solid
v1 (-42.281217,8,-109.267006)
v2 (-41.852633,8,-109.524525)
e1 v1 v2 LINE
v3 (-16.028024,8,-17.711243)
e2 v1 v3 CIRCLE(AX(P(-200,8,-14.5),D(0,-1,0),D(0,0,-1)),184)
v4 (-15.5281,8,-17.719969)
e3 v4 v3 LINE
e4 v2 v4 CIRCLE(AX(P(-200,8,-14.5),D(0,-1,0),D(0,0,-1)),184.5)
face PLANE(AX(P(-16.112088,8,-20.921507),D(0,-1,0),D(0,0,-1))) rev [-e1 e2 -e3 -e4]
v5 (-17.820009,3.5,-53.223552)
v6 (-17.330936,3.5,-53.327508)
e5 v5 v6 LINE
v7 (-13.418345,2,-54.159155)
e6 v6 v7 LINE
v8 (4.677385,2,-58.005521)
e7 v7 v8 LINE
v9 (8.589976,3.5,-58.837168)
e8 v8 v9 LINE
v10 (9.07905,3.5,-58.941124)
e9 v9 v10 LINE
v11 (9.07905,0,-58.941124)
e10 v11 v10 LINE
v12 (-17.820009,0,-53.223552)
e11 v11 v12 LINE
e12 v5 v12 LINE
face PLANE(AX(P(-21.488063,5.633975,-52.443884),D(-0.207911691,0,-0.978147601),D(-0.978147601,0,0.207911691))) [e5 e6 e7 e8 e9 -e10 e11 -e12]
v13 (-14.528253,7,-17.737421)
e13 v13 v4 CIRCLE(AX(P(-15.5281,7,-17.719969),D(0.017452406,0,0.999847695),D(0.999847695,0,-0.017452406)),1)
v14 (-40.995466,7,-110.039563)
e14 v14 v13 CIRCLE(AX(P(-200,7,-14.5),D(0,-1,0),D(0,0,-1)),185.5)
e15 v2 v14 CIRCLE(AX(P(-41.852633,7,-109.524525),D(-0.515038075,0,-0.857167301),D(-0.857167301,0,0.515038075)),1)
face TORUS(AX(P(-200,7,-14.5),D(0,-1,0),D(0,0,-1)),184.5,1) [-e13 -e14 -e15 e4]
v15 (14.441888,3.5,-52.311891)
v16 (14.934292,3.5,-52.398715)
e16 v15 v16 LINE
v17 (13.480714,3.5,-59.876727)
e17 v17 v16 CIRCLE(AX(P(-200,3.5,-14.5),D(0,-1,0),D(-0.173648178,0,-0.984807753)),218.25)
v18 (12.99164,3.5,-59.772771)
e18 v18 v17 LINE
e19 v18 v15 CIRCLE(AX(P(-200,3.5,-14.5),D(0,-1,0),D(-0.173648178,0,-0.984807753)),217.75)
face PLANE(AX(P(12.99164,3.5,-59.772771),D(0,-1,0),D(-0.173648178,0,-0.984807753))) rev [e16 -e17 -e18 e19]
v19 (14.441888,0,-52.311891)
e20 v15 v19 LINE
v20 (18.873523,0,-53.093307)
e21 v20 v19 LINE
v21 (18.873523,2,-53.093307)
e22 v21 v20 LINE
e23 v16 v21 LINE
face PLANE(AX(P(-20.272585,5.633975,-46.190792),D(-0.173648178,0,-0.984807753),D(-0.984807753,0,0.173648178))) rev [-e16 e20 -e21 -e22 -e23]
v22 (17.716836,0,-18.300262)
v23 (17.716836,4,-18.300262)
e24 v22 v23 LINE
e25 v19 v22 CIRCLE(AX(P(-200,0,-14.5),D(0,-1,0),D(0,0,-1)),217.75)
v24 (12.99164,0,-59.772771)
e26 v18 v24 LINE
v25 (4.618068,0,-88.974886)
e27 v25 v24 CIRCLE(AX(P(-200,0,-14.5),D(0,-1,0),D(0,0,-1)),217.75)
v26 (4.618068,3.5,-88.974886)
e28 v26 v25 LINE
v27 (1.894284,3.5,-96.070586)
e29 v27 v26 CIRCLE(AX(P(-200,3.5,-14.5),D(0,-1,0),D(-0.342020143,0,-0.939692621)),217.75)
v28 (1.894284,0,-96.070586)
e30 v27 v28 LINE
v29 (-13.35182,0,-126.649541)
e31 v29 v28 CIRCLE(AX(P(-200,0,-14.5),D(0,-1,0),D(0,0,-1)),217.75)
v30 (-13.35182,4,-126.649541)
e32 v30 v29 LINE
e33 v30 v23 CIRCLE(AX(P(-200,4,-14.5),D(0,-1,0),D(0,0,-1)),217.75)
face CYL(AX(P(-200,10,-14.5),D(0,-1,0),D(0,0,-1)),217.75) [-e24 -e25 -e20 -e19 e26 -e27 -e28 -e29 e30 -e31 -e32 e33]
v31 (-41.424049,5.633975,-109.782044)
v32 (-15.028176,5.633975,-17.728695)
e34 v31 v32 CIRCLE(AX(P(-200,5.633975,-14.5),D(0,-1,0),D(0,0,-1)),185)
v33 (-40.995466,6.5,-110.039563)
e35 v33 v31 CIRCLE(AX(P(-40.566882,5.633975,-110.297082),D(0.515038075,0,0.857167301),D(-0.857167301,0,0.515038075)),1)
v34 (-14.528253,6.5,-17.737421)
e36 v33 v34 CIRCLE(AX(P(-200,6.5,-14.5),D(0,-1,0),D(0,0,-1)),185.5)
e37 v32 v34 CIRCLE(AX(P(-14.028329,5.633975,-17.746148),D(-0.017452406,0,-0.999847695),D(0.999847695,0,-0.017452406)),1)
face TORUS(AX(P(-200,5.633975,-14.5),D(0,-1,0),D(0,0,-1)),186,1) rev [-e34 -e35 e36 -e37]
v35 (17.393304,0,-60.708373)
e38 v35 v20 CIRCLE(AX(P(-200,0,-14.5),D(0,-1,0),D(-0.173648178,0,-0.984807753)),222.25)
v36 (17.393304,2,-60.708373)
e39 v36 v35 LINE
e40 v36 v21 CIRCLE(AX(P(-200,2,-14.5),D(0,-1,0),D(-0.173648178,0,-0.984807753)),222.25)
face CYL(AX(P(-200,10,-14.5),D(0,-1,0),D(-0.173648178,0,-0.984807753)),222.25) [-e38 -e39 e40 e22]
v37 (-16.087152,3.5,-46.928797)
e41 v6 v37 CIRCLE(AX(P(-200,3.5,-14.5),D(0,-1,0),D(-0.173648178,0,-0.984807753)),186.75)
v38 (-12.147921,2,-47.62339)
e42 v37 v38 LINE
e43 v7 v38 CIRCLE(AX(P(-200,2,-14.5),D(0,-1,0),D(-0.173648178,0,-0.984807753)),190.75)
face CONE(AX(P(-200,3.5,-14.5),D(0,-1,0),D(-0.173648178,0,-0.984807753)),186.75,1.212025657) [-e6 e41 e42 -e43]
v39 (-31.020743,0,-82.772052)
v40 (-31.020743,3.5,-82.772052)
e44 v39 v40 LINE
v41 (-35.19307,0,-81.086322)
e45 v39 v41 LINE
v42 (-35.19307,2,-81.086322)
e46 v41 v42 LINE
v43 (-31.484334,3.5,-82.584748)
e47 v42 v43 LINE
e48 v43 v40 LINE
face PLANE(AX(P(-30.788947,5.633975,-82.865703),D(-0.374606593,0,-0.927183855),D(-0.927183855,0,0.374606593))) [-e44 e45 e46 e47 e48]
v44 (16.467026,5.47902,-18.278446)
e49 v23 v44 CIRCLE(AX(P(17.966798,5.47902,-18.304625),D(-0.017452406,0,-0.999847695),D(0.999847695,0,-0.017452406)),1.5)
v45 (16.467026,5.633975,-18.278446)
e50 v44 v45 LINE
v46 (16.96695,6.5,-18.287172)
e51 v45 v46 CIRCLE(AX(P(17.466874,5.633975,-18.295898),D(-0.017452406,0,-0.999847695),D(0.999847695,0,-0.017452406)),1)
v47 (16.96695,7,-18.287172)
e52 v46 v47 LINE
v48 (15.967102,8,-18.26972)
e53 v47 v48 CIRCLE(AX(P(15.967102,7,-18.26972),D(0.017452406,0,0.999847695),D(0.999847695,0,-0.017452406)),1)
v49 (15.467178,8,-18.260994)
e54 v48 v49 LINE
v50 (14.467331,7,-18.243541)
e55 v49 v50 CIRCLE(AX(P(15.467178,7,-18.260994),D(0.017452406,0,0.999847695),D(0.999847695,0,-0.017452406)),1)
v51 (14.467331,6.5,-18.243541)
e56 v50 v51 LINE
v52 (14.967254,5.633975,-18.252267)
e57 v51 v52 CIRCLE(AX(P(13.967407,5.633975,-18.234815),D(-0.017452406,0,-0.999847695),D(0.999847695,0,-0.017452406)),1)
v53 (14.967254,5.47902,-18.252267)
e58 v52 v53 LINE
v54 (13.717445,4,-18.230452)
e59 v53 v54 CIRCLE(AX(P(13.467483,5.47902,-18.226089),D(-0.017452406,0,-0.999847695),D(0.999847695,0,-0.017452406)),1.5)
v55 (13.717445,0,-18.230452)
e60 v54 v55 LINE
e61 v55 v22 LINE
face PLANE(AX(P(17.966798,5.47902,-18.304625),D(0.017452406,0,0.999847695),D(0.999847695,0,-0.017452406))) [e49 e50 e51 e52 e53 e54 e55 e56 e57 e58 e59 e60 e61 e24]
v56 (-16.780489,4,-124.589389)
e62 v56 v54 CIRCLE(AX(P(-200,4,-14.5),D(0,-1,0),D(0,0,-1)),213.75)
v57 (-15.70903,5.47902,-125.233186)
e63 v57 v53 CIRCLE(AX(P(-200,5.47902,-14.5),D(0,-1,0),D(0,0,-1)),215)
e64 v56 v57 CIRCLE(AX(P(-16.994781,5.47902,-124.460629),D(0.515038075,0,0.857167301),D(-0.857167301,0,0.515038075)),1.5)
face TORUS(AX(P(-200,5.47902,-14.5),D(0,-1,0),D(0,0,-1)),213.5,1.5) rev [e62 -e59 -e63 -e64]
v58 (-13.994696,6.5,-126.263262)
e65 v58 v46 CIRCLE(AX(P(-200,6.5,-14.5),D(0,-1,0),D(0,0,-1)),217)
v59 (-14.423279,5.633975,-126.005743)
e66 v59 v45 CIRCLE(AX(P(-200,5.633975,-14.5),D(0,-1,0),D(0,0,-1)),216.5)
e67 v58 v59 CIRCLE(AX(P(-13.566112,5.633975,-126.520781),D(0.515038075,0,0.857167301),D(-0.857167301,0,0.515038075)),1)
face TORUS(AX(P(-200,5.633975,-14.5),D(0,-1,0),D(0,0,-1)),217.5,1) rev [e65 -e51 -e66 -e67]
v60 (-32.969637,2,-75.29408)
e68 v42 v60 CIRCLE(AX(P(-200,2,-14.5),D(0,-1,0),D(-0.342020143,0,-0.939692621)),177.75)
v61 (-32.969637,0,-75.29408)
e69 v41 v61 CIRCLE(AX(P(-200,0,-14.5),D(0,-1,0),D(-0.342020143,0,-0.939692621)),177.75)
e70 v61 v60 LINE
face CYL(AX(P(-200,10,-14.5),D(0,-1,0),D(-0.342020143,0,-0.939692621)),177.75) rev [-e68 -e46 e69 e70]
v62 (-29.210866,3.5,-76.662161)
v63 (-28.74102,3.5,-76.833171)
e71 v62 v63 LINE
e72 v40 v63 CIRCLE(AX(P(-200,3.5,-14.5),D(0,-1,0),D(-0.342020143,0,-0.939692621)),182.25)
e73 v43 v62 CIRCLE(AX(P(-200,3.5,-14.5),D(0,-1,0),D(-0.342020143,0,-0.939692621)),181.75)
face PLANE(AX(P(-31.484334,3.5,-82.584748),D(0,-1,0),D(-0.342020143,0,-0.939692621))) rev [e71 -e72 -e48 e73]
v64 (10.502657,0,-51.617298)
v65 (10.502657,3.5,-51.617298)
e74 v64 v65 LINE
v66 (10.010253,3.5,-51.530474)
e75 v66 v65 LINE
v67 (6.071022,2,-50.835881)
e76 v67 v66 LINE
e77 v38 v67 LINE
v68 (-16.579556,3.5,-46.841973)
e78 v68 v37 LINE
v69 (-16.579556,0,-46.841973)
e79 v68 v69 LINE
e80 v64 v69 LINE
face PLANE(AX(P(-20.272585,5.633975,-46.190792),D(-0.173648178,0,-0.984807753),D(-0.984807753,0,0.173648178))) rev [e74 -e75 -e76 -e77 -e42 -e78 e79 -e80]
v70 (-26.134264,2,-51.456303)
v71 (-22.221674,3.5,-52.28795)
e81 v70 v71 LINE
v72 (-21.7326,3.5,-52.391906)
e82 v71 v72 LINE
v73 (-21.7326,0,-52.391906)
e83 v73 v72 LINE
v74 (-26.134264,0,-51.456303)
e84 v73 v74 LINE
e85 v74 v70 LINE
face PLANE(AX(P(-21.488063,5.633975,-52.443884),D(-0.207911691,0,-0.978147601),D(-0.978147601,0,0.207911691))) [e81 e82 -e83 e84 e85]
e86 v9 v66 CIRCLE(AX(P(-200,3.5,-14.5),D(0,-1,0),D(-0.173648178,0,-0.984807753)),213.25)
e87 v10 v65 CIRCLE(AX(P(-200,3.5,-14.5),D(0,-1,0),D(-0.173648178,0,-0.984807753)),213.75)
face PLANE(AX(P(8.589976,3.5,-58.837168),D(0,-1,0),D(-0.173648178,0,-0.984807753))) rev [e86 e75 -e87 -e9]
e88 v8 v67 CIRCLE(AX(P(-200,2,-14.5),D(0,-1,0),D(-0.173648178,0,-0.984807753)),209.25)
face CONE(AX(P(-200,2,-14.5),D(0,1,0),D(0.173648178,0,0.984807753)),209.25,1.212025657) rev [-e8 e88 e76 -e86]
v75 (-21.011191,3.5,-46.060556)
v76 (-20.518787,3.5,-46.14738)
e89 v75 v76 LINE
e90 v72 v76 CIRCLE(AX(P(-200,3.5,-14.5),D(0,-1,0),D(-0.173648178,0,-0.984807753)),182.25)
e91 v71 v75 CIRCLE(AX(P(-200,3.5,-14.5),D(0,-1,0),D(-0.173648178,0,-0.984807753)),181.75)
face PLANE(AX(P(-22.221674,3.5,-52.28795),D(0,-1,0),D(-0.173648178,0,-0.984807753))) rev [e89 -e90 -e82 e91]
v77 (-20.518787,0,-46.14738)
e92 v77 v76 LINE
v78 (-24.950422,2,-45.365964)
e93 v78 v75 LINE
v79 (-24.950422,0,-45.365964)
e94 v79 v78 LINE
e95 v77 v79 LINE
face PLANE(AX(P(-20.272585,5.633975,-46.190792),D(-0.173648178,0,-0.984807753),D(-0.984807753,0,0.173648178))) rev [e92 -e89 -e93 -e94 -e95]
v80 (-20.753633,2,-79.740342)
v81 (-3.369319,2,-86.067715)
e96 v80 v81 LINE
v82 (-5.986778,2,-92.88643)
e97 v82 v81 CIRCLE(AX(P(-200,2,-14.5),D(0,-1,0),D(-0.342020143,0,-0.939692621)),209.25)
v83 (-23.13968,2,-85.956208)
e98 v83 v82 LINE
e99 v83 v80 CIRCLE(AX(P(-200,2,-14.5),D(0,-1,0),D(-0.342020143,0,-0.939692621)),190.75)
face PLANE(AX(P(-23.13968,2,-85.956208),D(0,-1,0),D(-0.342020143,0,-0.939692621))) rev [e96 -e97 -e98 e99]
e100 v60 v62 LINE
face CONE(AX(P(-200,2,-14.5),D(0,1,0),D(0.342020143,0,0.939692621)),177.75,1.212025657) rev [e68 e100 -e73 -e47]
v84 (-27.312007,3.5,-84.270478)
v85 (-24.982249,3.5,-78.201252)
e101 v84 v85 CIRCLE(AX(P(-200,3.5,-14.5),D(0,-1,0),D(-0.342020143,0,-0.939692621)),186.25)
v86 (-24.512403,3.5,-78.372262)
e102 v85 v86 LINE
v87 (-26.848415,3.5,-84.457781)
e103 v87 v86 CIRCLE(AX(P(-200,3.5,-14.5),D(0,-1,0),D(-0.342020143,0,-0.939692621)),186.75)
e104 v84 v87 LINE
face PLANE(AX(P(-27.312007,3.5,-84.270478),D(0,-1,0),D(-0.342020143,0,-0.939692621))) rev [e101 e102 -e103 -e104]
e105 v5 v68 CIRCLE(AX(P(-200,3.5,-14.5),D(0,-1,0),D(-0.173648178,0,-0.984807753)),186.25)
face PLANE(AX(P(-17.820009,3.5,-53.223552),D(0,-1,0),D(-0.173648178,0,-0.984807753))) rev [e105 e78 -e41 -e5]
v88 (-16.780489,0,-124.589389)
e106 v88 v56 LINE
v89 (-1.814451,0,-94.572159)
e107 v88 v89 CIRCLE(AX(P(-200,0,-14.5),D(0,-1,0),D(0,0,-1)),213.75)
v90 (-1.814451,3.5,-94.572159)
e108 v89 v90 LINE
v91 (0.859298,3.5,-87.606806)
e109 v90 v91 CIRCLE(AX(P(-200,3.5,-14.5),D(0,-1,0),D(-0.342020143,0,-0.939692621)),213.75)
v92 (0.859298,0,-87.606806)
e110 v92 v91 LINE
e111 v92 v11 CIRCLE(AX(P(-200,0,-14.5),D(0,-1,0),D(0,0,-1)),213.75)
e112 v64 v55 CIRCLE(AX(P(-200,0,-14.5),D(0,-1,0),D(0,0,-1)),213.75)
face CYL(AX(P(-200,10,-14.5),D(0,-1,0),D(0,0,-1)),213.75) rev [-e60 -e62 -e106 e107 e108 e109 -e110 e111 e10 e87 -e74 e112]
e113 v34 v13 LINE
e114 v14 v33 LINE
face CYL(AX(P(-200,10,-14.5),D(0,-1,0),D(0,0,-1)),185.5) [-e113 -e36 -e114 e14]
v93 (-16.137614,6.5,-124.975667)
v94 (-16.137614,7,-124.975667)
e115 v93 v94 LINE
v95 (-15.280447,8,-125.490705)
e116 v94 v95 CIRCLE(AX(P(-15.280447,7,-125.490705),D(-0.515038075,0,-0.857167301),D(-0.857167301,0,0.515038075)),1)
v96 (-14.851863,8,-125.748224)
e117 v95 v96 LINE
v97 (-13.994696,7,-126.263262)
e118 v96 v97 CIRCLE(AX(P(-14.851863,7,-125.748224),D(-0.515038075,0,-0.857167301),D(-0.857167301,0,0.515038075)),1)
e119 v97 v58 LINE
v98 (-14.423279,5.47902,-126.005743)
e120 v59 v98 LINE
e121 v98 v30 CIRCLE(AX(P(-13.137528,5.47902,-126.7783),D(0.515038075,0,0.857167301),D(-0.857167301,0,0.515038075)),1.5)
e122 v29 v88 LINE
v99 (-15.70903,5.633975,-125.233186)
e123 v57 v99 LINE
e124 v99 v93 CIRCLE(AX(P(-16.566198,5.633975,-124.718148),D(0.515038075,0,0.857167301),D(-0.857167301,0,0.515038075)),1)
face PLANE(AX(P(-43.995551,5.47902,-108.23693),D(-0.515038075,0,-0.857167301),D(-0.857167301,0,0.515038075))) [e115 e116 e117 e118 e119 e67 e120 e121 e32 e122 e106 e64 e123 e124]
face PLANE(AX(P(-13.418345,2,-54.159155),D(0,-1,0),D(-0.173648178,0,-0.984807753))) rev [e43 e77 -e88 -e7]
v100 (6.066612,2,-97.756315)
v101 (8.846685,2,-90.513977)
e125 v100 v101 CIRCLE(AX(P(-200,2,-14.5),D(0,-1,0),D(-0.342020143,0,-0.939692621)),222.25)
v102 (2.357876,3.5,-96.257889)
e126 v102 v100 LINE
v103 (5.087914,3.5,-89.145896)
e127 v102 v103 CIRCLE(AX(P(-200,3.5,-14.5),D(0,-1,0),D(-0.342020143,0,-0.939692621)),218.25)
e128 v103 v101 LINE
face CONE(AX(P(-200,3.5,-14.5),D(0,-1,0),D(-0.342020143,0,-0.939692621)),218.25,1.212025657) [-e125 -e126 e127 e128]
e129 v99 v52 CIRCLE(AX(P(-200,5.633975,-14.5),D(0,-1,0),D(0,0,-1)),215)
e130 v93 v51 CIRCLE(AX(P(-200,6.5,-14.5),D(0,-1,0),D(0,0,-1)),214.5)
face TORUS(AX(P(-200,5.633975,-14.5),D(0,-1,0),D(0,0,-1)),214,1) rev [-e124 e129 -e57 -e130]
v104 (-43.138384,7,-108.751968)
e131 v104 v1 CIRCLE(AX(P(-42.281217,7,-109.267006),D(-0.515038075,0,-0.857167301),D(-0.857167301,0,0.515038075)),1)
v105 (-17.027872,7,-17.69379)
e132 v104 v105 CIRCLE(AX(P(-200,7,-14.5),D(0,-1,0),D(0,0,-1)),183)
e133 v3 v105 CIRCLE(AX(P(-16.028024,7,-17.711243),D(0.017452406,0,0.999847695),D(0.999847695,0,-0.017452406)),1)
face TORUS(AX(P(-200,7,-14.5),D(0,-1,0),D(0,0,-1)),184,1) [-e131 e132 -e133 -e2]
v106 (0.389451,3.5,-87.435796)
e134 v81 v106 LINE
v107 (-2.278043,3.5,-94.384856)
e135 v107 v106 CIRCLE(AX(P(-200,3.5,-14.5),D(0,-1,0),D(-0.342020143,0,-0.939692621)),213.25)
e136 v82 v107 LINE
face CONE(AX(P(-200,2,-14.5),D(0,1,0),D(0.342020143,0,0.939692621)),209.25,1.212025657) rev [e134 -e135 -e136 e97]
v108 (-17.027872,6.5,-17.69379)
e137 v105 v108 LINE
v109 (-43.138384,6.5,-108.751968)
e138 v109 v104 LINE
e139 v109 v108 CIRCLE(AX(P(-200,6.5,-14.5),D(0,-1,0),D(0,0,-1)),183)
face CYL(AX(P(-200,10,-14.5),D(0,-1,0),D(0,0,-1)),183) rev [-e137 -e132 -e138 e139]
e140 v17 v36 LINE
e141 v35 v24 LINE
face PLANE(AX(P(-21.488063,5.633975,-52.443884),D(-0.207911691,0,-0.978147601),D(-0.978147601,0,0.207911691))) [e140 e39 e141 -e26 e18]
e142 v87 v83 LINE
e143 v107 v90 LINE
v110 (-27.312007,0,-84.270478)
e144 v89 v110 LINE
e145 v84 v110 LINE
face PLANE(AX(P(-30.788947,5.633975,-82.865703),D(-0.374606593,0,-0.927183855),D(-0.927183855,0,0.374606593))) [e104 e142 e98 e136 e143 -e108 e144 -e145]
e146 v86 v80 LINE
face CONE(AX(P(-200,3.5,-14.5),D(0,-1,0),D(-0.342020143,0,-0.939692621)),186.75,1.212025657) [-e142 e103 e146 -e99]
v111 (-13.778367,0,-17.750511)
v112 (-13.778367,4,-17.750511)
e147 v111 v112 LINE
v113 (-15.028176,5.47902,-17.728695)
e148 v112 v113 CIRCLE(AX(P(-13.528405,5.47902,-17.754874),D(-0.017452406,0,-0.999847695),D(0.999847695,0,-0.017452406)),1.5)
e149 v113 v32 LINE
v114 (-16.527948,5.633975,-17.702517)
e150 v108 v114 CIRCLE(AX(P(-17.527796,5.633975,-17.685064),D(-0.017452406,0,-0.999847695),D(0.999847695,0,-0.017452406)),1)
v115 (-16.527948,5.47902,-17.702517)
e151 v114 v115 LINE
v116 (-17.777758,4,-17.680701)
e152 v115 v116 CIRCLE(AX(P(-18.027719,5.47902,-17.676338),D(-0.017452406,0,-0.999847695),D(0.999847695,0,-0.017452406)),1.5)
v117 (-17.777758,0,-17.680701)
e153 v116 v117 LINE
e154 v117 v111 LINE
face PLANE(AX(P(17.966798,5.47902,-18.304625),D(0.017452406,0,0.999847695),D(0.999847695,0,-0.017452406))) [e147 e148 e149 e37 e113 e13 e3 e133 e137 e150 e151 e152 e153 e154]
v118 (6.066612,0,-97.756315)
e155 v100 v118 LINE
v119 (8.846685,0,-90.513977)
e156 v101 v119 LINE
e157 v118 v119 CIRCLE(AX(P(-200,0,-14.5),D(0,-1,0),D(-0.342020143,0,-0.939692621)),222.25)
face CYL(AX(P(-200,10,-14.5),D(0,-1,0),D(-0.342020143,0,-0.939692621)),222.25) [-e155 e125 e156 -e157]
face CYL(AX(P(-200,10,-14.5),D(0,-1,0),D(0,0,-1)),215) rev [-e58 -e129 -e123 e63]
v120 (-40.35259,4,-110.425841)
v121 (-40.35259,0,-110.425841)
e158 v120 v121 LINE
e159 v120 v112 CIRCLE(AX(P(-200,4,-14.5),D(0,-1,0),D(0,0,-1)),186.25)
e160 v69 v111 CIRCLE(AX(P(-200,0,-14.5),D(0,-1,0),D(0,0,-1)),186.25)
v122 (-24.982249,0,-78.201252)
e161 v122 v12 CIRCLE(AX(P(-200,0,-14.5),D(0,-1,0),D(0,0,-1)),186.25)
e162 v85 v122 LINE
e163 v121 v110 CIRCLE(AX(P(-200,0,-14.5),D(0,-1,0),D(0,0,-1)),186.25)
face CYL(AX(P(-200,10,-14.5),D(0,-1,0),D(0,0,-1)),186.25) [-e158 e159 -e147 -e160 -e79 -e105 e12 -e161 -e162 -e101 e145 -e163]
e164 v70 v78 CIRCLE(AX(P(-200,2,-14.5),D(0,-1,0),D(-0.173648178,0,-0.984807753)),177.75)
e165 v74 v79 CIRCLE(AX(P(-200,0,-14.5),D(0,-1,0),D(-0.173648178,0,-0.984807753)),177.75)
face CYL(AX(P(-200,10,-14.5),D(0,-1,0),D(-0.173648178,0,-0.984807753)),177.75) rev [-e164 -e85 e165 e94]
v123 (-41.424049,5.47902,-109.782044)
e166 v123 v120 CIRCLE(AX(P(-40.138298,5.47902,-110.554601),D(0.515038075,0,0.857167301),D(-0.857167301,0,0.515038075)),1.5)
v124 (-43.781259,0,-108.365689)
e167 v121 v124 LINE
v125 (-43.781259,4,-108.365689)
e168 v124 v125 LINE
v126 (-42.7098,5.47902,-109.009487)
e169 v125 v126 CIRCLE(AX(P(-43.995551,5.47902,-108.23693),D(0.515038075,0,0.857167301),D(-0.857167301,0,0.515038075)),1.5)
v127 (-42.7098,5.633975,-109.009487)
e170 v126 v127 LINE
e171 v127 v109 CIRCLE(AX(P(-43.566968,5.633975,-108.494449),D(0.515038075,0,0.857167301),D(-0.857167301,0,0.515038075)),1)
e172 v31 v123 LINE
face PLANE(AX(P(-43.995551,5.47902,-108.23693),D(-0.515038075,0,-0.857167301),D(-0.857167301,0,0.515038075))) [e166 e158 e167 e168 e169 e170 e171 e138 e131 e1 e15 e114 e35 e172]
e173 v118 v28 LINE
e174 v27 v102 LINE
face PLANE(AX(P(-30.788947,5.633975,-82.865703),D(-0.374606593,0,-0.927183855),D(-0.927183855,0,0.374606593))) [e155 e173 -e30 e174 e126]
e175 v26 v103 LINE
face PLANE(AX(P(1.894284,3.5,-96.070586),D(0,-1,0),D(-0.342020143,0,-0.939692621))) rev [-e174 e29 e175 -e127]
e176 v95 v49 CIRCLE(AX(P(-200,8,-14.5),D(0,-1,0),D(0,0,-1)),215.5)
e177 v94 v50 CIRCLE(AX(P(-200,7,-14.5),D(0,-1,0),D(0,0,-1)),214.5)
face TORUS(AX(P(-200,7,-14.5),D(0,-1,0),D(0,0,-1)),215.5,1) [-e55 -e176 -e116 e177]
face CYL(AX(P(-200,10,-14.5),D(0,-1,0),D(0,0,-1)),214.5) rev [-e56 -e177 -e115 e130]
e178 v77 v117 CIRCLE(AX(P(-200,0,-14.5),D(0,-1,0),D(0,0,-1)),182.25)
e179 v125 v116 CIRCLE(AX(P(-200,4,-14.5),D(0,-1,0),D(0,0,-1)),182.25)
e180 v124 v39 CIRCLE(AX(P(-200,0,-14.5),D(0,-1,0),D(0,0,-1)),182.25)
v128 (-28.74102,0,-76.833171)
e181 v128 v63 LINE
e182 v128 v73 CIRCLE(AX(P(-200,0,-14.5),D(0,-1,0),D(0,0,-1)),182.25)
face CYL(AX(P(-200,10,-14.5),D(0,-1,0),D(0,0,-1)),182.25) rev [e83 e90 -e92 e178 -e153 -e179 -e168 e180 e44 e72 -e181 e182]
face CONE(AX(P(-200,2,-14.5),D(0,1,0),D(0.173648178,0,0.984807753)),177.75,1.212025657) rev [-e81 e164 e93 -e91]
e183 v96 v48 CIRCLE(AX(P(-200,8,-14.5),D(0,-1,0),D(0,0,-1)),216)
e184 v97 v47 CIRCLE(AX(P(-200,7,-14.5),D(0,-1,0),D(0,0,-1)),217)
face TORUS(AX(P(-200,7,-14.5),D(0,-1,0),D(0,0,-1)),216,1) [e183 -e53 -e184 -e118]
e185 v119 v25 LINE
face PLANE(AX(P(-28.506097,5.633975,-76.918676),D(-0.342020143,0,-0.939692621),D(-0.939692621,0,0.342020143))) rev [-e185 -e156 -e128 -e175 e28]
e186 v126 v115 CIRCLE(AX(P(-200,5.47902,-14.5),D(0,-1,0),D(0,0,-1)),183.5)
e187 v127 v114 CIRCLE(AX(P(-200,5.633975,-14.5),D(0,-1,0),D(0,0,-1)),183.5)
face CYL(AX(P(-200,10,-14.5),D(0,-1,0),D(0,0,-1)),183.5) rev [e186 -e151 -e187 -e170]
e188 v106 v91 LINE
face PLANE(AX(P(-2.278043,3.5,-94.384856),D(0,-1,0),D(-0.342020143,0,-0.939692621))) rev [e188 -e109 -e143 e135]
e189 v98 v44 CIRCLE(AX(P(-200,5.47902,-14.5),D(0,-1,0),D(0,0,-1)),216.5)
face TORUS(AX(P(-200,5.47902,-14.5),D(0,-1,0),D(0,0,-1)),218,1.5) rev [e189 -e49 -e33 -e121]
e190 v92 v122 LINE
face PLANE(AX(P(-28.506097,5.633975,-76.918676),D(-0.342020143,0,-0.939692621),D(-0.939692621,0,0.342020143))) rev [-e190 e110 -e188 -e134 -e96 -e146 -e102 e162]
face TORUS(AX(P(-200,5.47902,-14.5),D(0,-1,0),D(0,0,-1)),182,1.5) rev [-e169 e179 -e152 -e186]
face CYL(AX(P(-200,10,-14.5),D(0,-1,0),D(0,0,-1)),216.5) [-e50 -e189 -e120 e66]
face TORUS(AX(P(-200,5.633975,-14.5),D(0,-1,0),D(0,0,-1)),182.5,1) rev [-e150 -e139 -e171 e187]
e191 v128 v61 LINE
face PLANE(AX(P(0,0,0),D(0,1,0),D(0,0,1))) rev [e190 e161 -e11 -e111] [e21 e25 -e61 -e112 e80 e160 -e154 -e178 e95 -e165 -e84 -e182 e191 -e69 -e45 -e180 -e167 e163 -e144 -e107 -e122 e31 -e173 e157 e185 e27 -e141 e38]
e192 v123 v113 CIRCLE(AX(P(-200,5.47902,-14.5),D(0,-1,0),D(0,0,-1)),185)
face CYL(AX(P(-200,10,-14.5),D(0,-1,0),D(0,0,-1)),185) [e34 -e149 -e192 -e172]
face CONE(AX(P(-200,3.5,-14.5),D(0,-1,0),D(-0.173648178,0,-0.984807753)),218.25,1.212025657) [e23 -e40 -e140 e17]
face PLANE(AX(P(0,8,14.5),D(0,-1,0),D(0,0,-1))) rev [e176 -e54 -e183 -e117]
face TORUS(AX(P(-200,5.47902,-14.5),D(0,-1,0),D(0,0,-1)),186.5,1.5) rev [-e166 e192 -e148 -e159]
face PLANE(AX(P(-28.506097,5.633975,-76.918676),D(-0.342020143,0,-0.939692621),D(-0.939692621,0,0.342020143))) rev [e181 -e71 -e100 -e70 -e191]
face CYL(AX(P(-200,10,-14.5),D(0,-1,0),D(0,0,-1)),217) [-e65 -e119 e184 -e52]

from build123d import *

# Parameters (mm, degrees)
SKETCH_1_W               = 4
SKETCH_1_H               = 21
SKETCH_1_H_2             = 8
EXTRUDE_1_DEPTH          = 4
SKETCH_1_7_W             = 44.5
SKETCH_1_7_H             = 8
EXTRUDE_2_DEPTH          = 3.5
SKETCH_2_W               = 18.5
SKETCH_2_H               = 1.5
CUT_EXTRUDE_1_DEPTH      = 37.7704025
SKETCH_2_3_W             = 2.5
SKETCH_2_3_H             = 1.5
EXTRUDE_4_DEPTH          = 29
FILLET_1_R               = 1
FILLET_2_R               = 1.5
FILLET_3_R               = 1
REVOLVE_2_ANGLE          = 32
CUT_EXTRUDE_5_DEPTH      = 125.273573818
REVOLVE_1_ANGLE          = 2
PATTERN_CIRCULAR_1_COUNT = 4
PATTERN_CIRCULAR_1_ANGLE = 30
CUT_REVOLVE_1_ANGLE      = 1
CUT_REVOLVE_2_ANGLE      = 1
CUT_REVOLVE_3_ANGLE      = 1
CUT_REVOLVE_4_ANGLE      = 1


with BuildPart() as part:
    # 草图1 → 凸台-拉伸1 (new body)
    with BuildSketch(Plane(origin=(0, 0, 0), x_dir=(1, 0, 0), z_dir=(0, 1, 0))):
        with Locations((-15.75, -4)):
            Rectangle(SKETCH_1_W, SKETCH_1_H)
        with Locations((15.75, -4)):
            Rectangle(SKETCH_1_W, SKETCH_1_H)
        with Locations((15.75, 10.5)):
            Rectangle(SKETCH_1_W, SKETCH_1_H_2)
        with Locations((-15.75, 10.5)):
            Rectangle(SKETCH_1_W, SKETCH_1_H_2)
    extrude(amount=EXTRUDE_1_DEPTH)

    # 草图1<7> → 凸台-拉伸2 (add)
    with BuildSketch(Plane(origin=(0, 0, 0), x_dir=(1, 0, 0), z_dir=(0, 1, 0))):
        with Locations((0, 10.5)):
            Rectangle(SKETCH_1_7_W, SKETCH_1_7_H)
    extrude(amount=EXTRUDE_2_DEPTH)

    # 草图2 → 切除-拉伸1 (cut, through all)
    with BuildSketch(Plane(origin=(0, 0, -14.5), x_dir=(-1, 0, 0), z_dir=(0, 0, -1))):
        with Locations((0, 2.75)):
            Rectangle(SKETCH_2_W, SKETCH_2_H)
        Polygon((13.25, 3.5), (9.25, 3.5), (9.25, 2), align=None)
        Polygon((-9.25, 3.5), (-13.25, 3.5), (-9.25, 2), align=None)
        Polygon((-22.25, 3.5), (-22.25, 2), (-18.25, 3.5), align=None)
        Polygon((22.25, 3.5), (18.25, 3.5), (22.25, 2), align=None)
    extrude(amount=-CUT_EXTRUDE_1_DEPTH, mode=Mode.SUBTRACT)

    # 草图2<3> → 凸台-拉伸4 (add, through all)
    with BuildSketch(Plane(origin=(0, 0, -14.5), x_dir=(-1, 0, 0), z_dir=(0, 0, -1))):
        with Locations((-15.75, 7.25)):
            Rectangle(SKETCH_2_3_W, SKETCH_2_3_H)
        Polygon((-15, 6.5), (-16.5, 6.5), (-16.5, 4), (-15.75, 4), (-15, 4), align=None)
        with Locations((15.75, 7.25)):
            Rectangle(SKETCH_2_3_W, SKETCH_2_3_H)
        Polygon((16.5, 6.5), (15, 6.5), (15, 4), (15.75, 4), (16.5, 4), align=None)
    extrude(amount=-EXTRUDE_4_DEPTH)

    # 圆角1
    # the kernel refuses this fillet: 1 mm, written as the material it adds along each edge
    with BuildSketch(Plane(origin=(-16.5, 6.5, -14.5), x_dir=(-1, 0, 0), z_dir=(0, 0, 1)), Plane(origin=(15, 6.5, -14.5), x_dir=(-1, 0, 0), z_dir=(0, 0, 1))) as fillet_1_piece_1:
        with BuildLine():
            CenterArc((1, 0.866025404), FILLET_1_R, 180, 60)
            Line((0, 0.866025404), (-0.02, 0.866025404))
            Line((-0.02, 0.866025404), (-0.02, 0))
            Line((-0.02, 0), (0, -0.02))
            ThreePointArc((0, -0.02), (0.25, -0.02), (0.49, -0.017320508))
            Line((0.49, -0.017320508), (0.5, 0))
        make_face()
    extrude(amount=29)
    with BuildSketch(Plane(origin=(-15, 6.5, -14.5), x_dir=(0, -1, 0), z_dir=(0, 0, 1)), Plane(origin=(16.5, 6.5, -14.5), x_dir=(0, -1, 0), z_dir=(0, 0, 1))) as fillet_1_piece_2:
        with BuildLine():
            CenterArc((0.866025404, 1), FILLET_1_R, 210, 60)
            Line((0, 0.5), (-0.017320508, 0.49))
            ThreePointArc((-0.017320508, 0.49), (-0.02, 0.25), (-0.02, 0))
            Line((-0.02, 0), (0, -0.02))
            Line((0, -0.02), (0.866025404, -0.02))
            Line((0.866025404, -0.02), (0.866025404, 0))
        make_face()
    extrude(amount=29)

    # 圆角2
    # the kernel refuses this fillet: 1.5 mm, written as the material it adds along each edge
    with BuildSketch(Plane(origin=(16.5, 4, -14.5), x_dir=(1, 0, 0), z_dir=(0, 0, 1))) as fillet_2_piece_1:
        with BuildLine():
            CenterArc((1.5, 1.479019946), FILLET_2_R, 180, 80.405931773)
            Line((0, 1.479019946), (-0.03, 1.479019946))
            Line((-0.03, 1.479019946), (-0.03, 0))
            Line((-0.03, 0), (0, -0.03))
            ThreePointArc((0, -0.03), (0.625, -0.03), (1.245, -0.029580399))
            Line((1.245, -0.029580399), (1.25, 0))
        make_face()
    extrude(amount=29)
    with BuildSketch(Plane(origin=(15, 4, -14.5), x_dir=(0, 1, 0), z_dir=(0, 0, 1)), Plane(origin=(-16.5, 4, -14.5), x_dir=(0, 1, 0), z_dir=(0, 0, 1))) as fillet_2_piece_2:
        with BuildLine():
            CenterArc((1.479019946, 1.5), FILLET_2_R, 189.594068227, 80.405931773)
            Line((0, 1.25), (-0.029580399, 1.245))
            ThreePointArc((-0.029580399, 1.245), (-0.03, 0.625), (-0.03, 0))
            Line((-0.03, 0), (0, -0.03))
            Line((0, -0.03), (1.479019946, -0.03))
            Line((1.479019946, -0.03), (1.479019946, 0))
        make_face()
    extrude(amount=29)
    with BuildSketch(Plane(origin=(-15, 4, -14.5), x_dir=(0, 1, 0), z_dir=(0, 0, 1))) as fillet_2_piece_3:
        with BuildLine():
            CenterArc((1.479019946, -1.5), FILLET_2_R, 90, 80.405931773)
            Line((0, -1.25), (-0.029580399, -1.245))
            ThreePointArc((-0.029580399, -1.245), (-0.03, -0.625), (-0.03, 0))
            Line((-0.03, 0), (0, 0.03))
            Line((0, 0.03), (1.479019946, 0.03))
            Line((1.479019946, 0.03), (1.479019946, 0))
        make_face()
    extrude(amount=29)

    # 圆角3
    fillet_3_edges = [part.edges().sort_by_distance(p)[0] for p in [
        (14.5, 8, 0),
        (17, 8, 0),
        (-17, 8, 0),
        (-14.5, 8, 0),
    ]]
    fillet(fillet_3_edges, radius=FILLET_3_R)

    # 草图7 → 旋转2 (revolve)
    with BuildSketch(Plane(origin=(0, 0, -14.5), x_dir=(-1, 0, 0), z_dir=(0, 0, -1))):
        with BuildLine():
            Line((-17.75, 3.5), (-17.75, 0))
            Line((-17.75, 0), (-13.75, 0))
            Line((-13.75, 0), (-13.75, 3.5))
            Line((-13.75, 3.5), (-13.75, 4))
            ThreePointArc((-13.75, 4), (-14.645643924, 4.510774109), (-15, 5.479019946))
            Line((-15, 5.479019946), (-15, 5.633974596))
            ThreePointArc((-15, 5.633974596), (-14.866025404, 6.133974596), (-14.5, 6.5))
            Line((-14.5, 6.5), (-14.5, 7))
            ThreePointArc((-14.5, 7), (-14.792893219, 7.707106781), (-15.5, 8))
            Line((-15.5, 8), (-16, 8))
            ThreePointArc((-16, 8), (-16.707106781, 7.707106781), (-17, 7))
            Line((-17, 7), (-17, 6.5))
            ThreePointArc((-17, 6.5), (-16.633974596, 6.133974596), (-16.5, 5.633974596))
            Line((-16.5, 5.633974596), (-16.5, 5.479019946))
            ThreePointArc((-16.5, 5.479019946), (-16.854356076, 4.510774109), (-17.75, 4))
            Line((-17.75, 4), (-17.75, 3.5))
        make_face()
        with BuildLine():
            Line((13.75, 3.5), (13.75, 0))
            Line((13.75, 0), (17.75, 0))
            Line((17.75, 0), (17.75, 3.5))
            Line((17.75, 3.5), (17.75, 4))
            ThreePointArc((17.75, 4), (16.854356076, 4.510774109), (16.5, 5.479019946))
            Line((16.5, 5.479019946), (16.5, 5.633974596))
            ThreePointArc((16.5, 5.633974596), (16.633974596, 6.133974596), (17, 6.5))
            Line((17, 6.5), (17, 7))
            ThreePointArc((17, 7), (16.707106781, 7.707106781), (16, 8))
            Line((16, 8), (15.5, 8))
            ThreePointArc((15.5, 8), (14.792893219, 7.707106781), (14.5, 7))
            Line((14.5, 7), (14.5, 6.5))
            ThreePointArc((14.5, 6.5), (14.866025404, 6.133974596), (15, 5.633974596))
            Line((15, 5.633974596), (15, 5.479019946))
            ThreePointArc((15, 5.479019946), (14.645643924, 4.510774109), (13.75, 4))
            Line((13.75, 4), (13.75, 3.5))
        make_face()
    revolve(axis=Axis((-200, 10, -14.5), (0, 1, 0)), revolution_arc=REVOLVE_2_ANGLE)

    # 草图5<2> → 切除-拉伸5 (cut, through all)
    with BuildSketch(Plane(origin=(0, 0, -14.5), x_dir=(-1, 0, 0), z_dir=(0, 0, -1))):
        with BuildLine():
            Line((17, 6.5), (17, 7))
            ThreePointArc((17, 7), (16.707106781, 7.707106781), (16, 8))
            Line((16, 8), (15.5, 8))
            ThreePointArc((15.5, 8), (14.792893219, 7.707106781), (14.5, 7))
            Line((14.5, 7), (14.5, 6.5))
            ThreePointArc((14.5, 6.5), (14.866025404, 6.133974596), (15, 5.633974596))
            Line((15, 5.633974596), (15, 5.479019946))
            ThreePointArc((15, 5.479019946), (14.645643924, 4.510774109), (13.75, 4))
            Line((13.75, 4), (13.75, 3.5))
            Line((13.75, 3.5), (13.25, 3.5))
            Line((13.25, 3.5), (9.25, 2))
            Line((9.25, 2), (-9.25, 2))
            Line((-9.25, 2), (-13.25, 3.5))
            Line((-13.25, 3.5), (-13.75, 3.5))
            Line((-13.75, 3.5), (-13.75, 4))
            ThreePointArc((-13.75, 4), (-14.645643924, 4.510774109), (-15, 5.479019946))
            Line((-15, 5.479019946), (-15, 5.633974596))
            ThreePointArc((-15, 5.633974596), (-14.866025404, 6.133974596), (-14.5, 6.5))
            Line((-14.5, 6.5), (-14.5, 7))
            ThreePointArc((-14.5, 7), (-14.792893219, 7.707106781), (-15.5, 8))
            Line((-15.5, 8), (-16, 8))
            ThreePointArc((-16, 8), (-16.707106781, 7.707106781), (-17, 7))
            Line((-17, 7), (-17, 6.5))
            ThreePointArc((-17, 6.5), (-16.633974596, 6.133974596), (-16.5, 5.633974596))
            Line((-16.5, 5.633974596), (-16.5, 5.479019946))
            ThreePointArc((-16.5, 5.479019946), (-16.854356076, 4.510774109), (-17.75, 4))
            Line((-17.75, 4), (-17.75, 3.5))
            Line((-17.75, 3.5), (-18.25, 3.5))
            Line((-18.25, 3.5), (-22.25, 2))
            Line((-22.25, 2), (-22.25, 0))
            Line((-22.25, 0), (22.25, 0))
            Line((22.25, 0), (22.25, 2))
            Line((22.25, 2), (18.25, 3.5))
            Line((18.25, 3.5), (17.75, 3.5))
            Line((17.75, 3.5), (17.75, 4))
            ThreePointArc((17.75, 4), (16.854356076, 4.510774109), (16.5, 5.479019946))
            Line((16.5, 5.479019946), (16.5, 5.633974596))
            ThreePointArc((16.5, 5.633974596), (16.633974596, 6.133974596), (17, 6.5))
        make_face()
    extrude(amount=-CUT_EXTRUDE_5_DEPTH, mode=Mode.SUBTRACT)


with BuildPart() as cut_extrude_5_piece_1:
    # of the separate pieces the step leaves, piece 1, a body of its own (cut_extrude_5_pieces)
    add(part.part.solids().sort_by_distance((13.75, 0, -14.5))[0])



with BuildPart() as cut_extrude_5_piece_2:
    # of the separate pieces the step leaves, piece 2, a body of its own (cut_extrude_5_pieces)
    add(part.part.solids().sort_by_distance((-13.75, 4, -14.5))[0])


with BuildPart() as cut_extrude_5_piece_1_1:
    add(cut_extrude_5_piece_1.part)

    add(cut_extrude_5_piece_2.part)  # 旋转1 merges 切除-拉伸5 piece 2
    # 草图5 → 旋转1 (revolve)
    with BuildSketch(Plane(origin=(0, 0, -14.5), x_dir=(-1, 0, 0), z_dir=(0, 0, -1))):
        with BuildLine():
            Line((17, 6.5), (17, 7))
            ThreePointArc((17, 7), (16.707106781, 7.707106781), (16, 8))
            Line((16, 8), (15.5, 8))
            ThreePointArc((15.5, 8), (14.792893219, 7.707106781), (14.5, 7))
            Line((14.5, 7), (14.5, 6.5))
            ThreePointArc((14.5, 6.5), (14.866025404, 6.133974596), (15, 5.633974596))
            Line((15, 5.633974596), (15, 5.479019946))
            ThreePointArc((15, 5.479019946), (14.645643924, 4.510774109), (13.75, 4))
            Line((13.75, 4), (13.75, 3.5))
            Line((13.75, 3.5), (13.25, 3.5))
            Line((13.25, 3.5), (9.25, 2))
            Line((9.25, 2), (-9.25, 2))
            Line((-9.25, 2), (-13.25, 3.5))
            Line((-13.25, 3.5), (-13.75, 3.5))
            Line((-13.75, 3.5), (-13.75, 4))
            ThreePointArc((-13.75, 4), (-14.645643924, 4.510774109), (-15, 5.479019946))
            Line((-15, 5.479019946), (-15, 5.633974596))
            ThreePointArc((-15, 5.633974596), (-14.866025404, 6.133974596), (-14.5, 6.5))
            Line((-14.5, 6.5), (-14.5, 7))
            ThreePointArc((-14.5, 7), (-14.792893219, 7.707106781), (-15.5, 8))
            Line((-15.5, 8), (-16, 8))
            ThreePointArc((-16, 8), (-16.707106781, 7.707106781), (-17, 7))
            Line((-17, 7), (-17, 6.5))
            ThreePointArc((-17, 6.5), (-16.633974596, 6.133974596), (-16.5, 5.633974596))
            Line((-16.5, 5.633974596), (-16.5, 5.479019946))
            ThreePointArc((-16.5, 5.479019946), (-16.854356076, 4.510774109), (-17.75, 4))
            Line((-17.75, 4), (-17.75, 3.5))
            Line((-17.75, 3.5), (-18.25, 3.5))
            Line((-18.25, 3.5), (-22.25, 2))
            Line((-22.25, 2), (-22.25, 0))
            Line((-22.25, 0), (22.25, 0))
            Line((22.25, 0), (22.25, 2))
            Line((22.25, 2), (18.25, 3.5))
            Line((18.25, 3.5), (17.75, 3.5))
            Line((17.75, 3.5), (17.75, 4))
            ThreePointArc((17.75, 4), (16.854356076, 4.510774109), (16.5, 5.479019946))
            Line((16.5, 5.479019946), (16.5, 5.633974596))
            ThreePointArc((16.5, 5.633974596), (16.633974596, 6.133974596), (17, 6.5))
        make_face()
    revolve_1 = revolve(axis=Axis((-200, 10, -14.5), (0, 1, 0)), revolution_arc=REVOLVE_1_ANGLE)

    # 阵列(圆周)1: 旋转1 ×4 about axis
    pattern_circular_1_axis = Axis((-200, 0, -14.5), (0, 1, 0))
    for i in range(1, PATTERN_CIRCULAR_1_COUNT):
        add(revolve_1.rotate(pattern_circular_1_axis, i * PATTERN_CIRCULAR_1_ANGLE / (PATTERN_CIRCULAR_1_COUNT - 1)))

    # 草图8 → 切除-旋转1 (revolve, cut)
    with BuildSketch(Plane.XY.offset(-14.5)):
        with BuildLine():
            Line((-22.25, 2), (-22.25, 0))
            Line((-22.25, 0), (22.25, 0))
            Line((22.25, 0), (22.25, 2))
            Line((22.25, 2), (18.25, 3.5))
            Line((18.25, 3.5), (17.75, 3.5))
            Line((17.75, 3.5), (17.75, 4))
            ThreePointArc((17.75, 4), (16.854356076, 4.510774109), (16.5, 5.479019946))
            Line((16.5, 5.479019946), (16.5, 5.633974596))
            ThreePointArc((16.5, 5.633974596), (16.633974596, 6.133974596), (17, 6.5))
            Line((17, 6.5), (17, 7))
            ThreePointArc((17, 7), (16.707106781, 7.707106781), (16, 8))
            Line((16, 8), (15.5, 8))
            ThreePointArc((15.5, 8), (14.792893219, 7.707106781), (14.5, 7))
            Line((14.5, 7), (14.5, 6.5))
            ThreePointArc((14.5, 6.5), (14.866025404, 6.133974596), (15, 5.633974596))
            Line((15, 5.633974596), (15, 5.479019946))
            ThreePointArc((15, 5.479019946), (14.645643924, 4.510774109), (13.75, 4))
            Line((13.75, 4), (13.75, 3.5))
            Line((13.75, 3.5), (13.25, 3.5))
            Line((13.25, 3.5), (9.25, 2))
            Line((9.25, 2), (-9.25, 2))
            Line((-9.25, 2), (-13.25, 3.5))
            Line((-13.25, 3.5), (-13.75, 3.5))
            Line((-13.75, 3.5), (-13.75, 4))
            ThreePointArc((-13.75, 4), (-14.645643924, 4.510774109), (-15, 5.479019946))
            Line((-15, 5.479019946), (-15, 5.633974596))
            ThreePointArc((-15, 5.633974596), (-14.866025404, 6.133974596), (-14.5, 6.5))
            Line((-14.5, 6.5), (-14.5, 7))
            ThreePointArc((-14.5, 7), (-14.792893219, 7.707106781), (-15.5, 8))
            Line((-15.5, 8), (-16, 8))
            ThreePointArc((-16, 8), (-16.707106781, 7.707106781), (-17, 7))
            Line((-17, 7), (-17, 6.5))
            ThreePointArc((-17, 6.5), (-16.633974596, 6.133974596), (-16.5, 5.633974596))
            Line((-16.5, 5.633974596), (-16.5, 5.479019946))
            ThreePointArc((-16.5, 5.479019946), (-16.854356076, 4.510774109), (-17.75, 4))
            Line((-17.75, 4), (-17.75, 3.5))
            Line((-17.75, 3.5), (-18.25, 3.5))
            Line((-18.25, 3.5), (-22.25, 2))
        make_face()
    revolve(axis=Axis((-200, 10, -14.5), (0, 1, 0)), revolution_arc=CUT_REVOLVE_1_ANGLE, mode=Mode.SUBTRACT)

    # 草图9 → 切除-旋转2 (revolve, cut)
    with BuildSketch(Plane(origin=(-62.679142157, 0, -100.307595444), x_dir=(-0.8480480961564253, 0, 0.529919264233206), z_dir=(-0.529919264233206, 0, -0.8480480961564253))):
        with BuildLine():
            Line((-15.8242101, 0), (-15.8242101, 2))
            Line((-15.8242101, 2), (-19.8242101, 3.5))
            Line((-19.8242101, 3.5), (-20.3242101, 3.5))
            Line((-20.3242101, 3.5), (-20.3242101, 4))
            ThreePointArc((-20.3242101, 4), (-21.219854024, 4.510774109), (-21.5742101, 5.479019946))
            Line((-21.5742101, 5.479019946), (-21.5742101, 5.633974596))
            ThreePointArc((-21.5742101, 5.633974596), (-21.440235504, 6.133974596), (-21.0742101, 6.5))
            Line((-21.0742101, 6.5), (-21.0742101, 7))
            ThreePointArc((-21.0742101, 7), (-21.367103319, 7.707106781), (-22.0742101, 8))
            Line((-22.0742101, 8), (-22.5742101, 8))
            ThreePointArc((-22.5742101, 8), (-23.281316881, 7.707106781), (-23.5742101, 7))
            Line((-23.5742101, 7), (-23.5742101, 6.5))
            ThreePointArc((-23.5742101, 6.5), (-23.208184696, 6.133974596), (-23.0742101, 5.633974596))
            Line((-23.0742101, 5.633974596), (-23.0742101, 5.479019946))
            ThreePointArc((-23.0742101, 5.479019946), (-23.428566176, 4.510774109), (-24.3242101, 4))
            Line((-24.3242101, 4), (-24.3242101, 3.5))
            Line((-24.3242101, 3.5), (-24.8242101, 3.5))
            Line((-24.8242101, 3.5), (-28.8242101, 2))
            Line((-28.8242101, 2), (-47.3242101, 2))
            Line((-47.3242101, 2), (-51.3242101, 3.5))
            Line((-51.3242101, 3.5), (-51.8242101, 3.5))
            Line((-51.8242101, 3.5), (-51.8242101, 4))
            ThreePointArc((-51.8242101, 4), (-52.719854024, 4.510774109), (-53.0742101, 5.479019946))
            Line((-53.0742101, 5.479019946), (-53.0742101, 5.633974596))
            ThreePointArc((-53.0742101, 5.633974596), (-52.940235504, 6.133974596), (-52.5742101, 6.5))
            Line((-52.5742101, 6.5), (-52.5742101, 7))
            ThreePointArc((-52.5742101, 7), (-52.867103319, 7.707106781), (-53.5742101, 8))
            Line((-53.5742101, 8), (-54.0742101, 8))
            ThreePointArc((-54.0742101, 8), (-54.781316881, 7.707106781), (-55.0742101, 7))
            Line((-55.0742101, 7), (-55.0742101, 6.5))
            ThreePointArc((-55.0742101, 6.5), (-54.708184696, 6.133974596), (-54.5742101, 5.633974596))
            Line((-54.5742101, 5.633974596), (-54.5742101, 5.479019946))
            ThreePointArc((-54.5742101, 5.479019946), (-54.928566176, 4.510774109), (-55.8242101, 4))
            Line((-55.8242101, 4), (-55.8242101, 3.5))
            Line((-55.8242101, 3.5), (-56.3242101, 3.5))
            Line((-56.3242101, 3.5), (-60.3242101, 2))
            Line((-60.3242101, 2), (-60.3242101, 0))
            Line((-60.3242101, 0), (-15.8242101, 0))
        make_face()
    revolve(axis=Axis((-200, 10, -14.5), (0, -1, 0)), revolution_arc=CUT_REVOLVE_2_ANGLE, mode=Mode.SUBTRACT)

    # 草图10 → 切除-旋转3 (revolve, cut)
    with BuildSketch(Plane(origin=(-0.313938649, 0, -17.985533166), x_dir=(0.9998476951563913, 0, -0.01745240643728355), z_dir=(0.01745240643728355, 0, 0.9998476951563913))):
        Polygon((-17.466479138, 3.5), (-17.466479138, 0), (-21.966479138, 0), (-21.966479138, 2), (-17.966479138, 3.5), align=None)
        Polygon((-13.466479138, 3.5), (-13.466479138, 0), (14.033520862, 0), (14.033520862, 3.5), (13.533520862, 3.5), (9.533520862, 2), (-8.966479138, 2), (-12.966479138, 3.5), align=None)
        Polygon((18.033520862, 3.5), (18.033520862, 0), (22.533520862, 0), (22.533520862, 2), (18.533520862, 3.5), align=None)
    revolve(axis=Axis((-200, 10, -14.5), (0, 1, 0)), revolution_arc=CUT_REVOLVE_3_ANGLE, mode=Mode.SUBTRACT)

    # 草图11 → 切除-旋转4 (revolve, cut)
    with BuildSketch(Plane(origin=(-59.45421377, 0, -98.948428116), x_dir=(-0.8571673007021117, 0, 0.5150380749100554), z_dir=(-0.5150380749100554, 0, -0.8571673007021118))):
        Polygon((-53.784591946, 3.5), (-53.784591946, 0), (-58.284591946, 0), (-58.284591946, 2), (-54.284591946, 3.5), align=None)
        Polygon((-49.784591946, 3.5), (-49.784591946, 0), (-22.284591946, 0), (-22.284591946, 3.5), (-22.784591946, 3.5), (-26.784591946, 2), (-45.284591946, 2), (-49.284591946, 3.5), align=None)
        Polygon((-18.284591946, 3.5), (-18.284591946, 0), (-13.784591946, 0), (-13.784591946, 2), (-17.784591946, 3.5), align=None)
    revolve(axis=Axis((-200, 10, -14.5), (0, -1, 0)), revolution_arc=CUT_REVOLVE_4_ANGLE, mode=Mode.SUBTRACT)


solid = cut_extrude_5_piece_1_1.part
